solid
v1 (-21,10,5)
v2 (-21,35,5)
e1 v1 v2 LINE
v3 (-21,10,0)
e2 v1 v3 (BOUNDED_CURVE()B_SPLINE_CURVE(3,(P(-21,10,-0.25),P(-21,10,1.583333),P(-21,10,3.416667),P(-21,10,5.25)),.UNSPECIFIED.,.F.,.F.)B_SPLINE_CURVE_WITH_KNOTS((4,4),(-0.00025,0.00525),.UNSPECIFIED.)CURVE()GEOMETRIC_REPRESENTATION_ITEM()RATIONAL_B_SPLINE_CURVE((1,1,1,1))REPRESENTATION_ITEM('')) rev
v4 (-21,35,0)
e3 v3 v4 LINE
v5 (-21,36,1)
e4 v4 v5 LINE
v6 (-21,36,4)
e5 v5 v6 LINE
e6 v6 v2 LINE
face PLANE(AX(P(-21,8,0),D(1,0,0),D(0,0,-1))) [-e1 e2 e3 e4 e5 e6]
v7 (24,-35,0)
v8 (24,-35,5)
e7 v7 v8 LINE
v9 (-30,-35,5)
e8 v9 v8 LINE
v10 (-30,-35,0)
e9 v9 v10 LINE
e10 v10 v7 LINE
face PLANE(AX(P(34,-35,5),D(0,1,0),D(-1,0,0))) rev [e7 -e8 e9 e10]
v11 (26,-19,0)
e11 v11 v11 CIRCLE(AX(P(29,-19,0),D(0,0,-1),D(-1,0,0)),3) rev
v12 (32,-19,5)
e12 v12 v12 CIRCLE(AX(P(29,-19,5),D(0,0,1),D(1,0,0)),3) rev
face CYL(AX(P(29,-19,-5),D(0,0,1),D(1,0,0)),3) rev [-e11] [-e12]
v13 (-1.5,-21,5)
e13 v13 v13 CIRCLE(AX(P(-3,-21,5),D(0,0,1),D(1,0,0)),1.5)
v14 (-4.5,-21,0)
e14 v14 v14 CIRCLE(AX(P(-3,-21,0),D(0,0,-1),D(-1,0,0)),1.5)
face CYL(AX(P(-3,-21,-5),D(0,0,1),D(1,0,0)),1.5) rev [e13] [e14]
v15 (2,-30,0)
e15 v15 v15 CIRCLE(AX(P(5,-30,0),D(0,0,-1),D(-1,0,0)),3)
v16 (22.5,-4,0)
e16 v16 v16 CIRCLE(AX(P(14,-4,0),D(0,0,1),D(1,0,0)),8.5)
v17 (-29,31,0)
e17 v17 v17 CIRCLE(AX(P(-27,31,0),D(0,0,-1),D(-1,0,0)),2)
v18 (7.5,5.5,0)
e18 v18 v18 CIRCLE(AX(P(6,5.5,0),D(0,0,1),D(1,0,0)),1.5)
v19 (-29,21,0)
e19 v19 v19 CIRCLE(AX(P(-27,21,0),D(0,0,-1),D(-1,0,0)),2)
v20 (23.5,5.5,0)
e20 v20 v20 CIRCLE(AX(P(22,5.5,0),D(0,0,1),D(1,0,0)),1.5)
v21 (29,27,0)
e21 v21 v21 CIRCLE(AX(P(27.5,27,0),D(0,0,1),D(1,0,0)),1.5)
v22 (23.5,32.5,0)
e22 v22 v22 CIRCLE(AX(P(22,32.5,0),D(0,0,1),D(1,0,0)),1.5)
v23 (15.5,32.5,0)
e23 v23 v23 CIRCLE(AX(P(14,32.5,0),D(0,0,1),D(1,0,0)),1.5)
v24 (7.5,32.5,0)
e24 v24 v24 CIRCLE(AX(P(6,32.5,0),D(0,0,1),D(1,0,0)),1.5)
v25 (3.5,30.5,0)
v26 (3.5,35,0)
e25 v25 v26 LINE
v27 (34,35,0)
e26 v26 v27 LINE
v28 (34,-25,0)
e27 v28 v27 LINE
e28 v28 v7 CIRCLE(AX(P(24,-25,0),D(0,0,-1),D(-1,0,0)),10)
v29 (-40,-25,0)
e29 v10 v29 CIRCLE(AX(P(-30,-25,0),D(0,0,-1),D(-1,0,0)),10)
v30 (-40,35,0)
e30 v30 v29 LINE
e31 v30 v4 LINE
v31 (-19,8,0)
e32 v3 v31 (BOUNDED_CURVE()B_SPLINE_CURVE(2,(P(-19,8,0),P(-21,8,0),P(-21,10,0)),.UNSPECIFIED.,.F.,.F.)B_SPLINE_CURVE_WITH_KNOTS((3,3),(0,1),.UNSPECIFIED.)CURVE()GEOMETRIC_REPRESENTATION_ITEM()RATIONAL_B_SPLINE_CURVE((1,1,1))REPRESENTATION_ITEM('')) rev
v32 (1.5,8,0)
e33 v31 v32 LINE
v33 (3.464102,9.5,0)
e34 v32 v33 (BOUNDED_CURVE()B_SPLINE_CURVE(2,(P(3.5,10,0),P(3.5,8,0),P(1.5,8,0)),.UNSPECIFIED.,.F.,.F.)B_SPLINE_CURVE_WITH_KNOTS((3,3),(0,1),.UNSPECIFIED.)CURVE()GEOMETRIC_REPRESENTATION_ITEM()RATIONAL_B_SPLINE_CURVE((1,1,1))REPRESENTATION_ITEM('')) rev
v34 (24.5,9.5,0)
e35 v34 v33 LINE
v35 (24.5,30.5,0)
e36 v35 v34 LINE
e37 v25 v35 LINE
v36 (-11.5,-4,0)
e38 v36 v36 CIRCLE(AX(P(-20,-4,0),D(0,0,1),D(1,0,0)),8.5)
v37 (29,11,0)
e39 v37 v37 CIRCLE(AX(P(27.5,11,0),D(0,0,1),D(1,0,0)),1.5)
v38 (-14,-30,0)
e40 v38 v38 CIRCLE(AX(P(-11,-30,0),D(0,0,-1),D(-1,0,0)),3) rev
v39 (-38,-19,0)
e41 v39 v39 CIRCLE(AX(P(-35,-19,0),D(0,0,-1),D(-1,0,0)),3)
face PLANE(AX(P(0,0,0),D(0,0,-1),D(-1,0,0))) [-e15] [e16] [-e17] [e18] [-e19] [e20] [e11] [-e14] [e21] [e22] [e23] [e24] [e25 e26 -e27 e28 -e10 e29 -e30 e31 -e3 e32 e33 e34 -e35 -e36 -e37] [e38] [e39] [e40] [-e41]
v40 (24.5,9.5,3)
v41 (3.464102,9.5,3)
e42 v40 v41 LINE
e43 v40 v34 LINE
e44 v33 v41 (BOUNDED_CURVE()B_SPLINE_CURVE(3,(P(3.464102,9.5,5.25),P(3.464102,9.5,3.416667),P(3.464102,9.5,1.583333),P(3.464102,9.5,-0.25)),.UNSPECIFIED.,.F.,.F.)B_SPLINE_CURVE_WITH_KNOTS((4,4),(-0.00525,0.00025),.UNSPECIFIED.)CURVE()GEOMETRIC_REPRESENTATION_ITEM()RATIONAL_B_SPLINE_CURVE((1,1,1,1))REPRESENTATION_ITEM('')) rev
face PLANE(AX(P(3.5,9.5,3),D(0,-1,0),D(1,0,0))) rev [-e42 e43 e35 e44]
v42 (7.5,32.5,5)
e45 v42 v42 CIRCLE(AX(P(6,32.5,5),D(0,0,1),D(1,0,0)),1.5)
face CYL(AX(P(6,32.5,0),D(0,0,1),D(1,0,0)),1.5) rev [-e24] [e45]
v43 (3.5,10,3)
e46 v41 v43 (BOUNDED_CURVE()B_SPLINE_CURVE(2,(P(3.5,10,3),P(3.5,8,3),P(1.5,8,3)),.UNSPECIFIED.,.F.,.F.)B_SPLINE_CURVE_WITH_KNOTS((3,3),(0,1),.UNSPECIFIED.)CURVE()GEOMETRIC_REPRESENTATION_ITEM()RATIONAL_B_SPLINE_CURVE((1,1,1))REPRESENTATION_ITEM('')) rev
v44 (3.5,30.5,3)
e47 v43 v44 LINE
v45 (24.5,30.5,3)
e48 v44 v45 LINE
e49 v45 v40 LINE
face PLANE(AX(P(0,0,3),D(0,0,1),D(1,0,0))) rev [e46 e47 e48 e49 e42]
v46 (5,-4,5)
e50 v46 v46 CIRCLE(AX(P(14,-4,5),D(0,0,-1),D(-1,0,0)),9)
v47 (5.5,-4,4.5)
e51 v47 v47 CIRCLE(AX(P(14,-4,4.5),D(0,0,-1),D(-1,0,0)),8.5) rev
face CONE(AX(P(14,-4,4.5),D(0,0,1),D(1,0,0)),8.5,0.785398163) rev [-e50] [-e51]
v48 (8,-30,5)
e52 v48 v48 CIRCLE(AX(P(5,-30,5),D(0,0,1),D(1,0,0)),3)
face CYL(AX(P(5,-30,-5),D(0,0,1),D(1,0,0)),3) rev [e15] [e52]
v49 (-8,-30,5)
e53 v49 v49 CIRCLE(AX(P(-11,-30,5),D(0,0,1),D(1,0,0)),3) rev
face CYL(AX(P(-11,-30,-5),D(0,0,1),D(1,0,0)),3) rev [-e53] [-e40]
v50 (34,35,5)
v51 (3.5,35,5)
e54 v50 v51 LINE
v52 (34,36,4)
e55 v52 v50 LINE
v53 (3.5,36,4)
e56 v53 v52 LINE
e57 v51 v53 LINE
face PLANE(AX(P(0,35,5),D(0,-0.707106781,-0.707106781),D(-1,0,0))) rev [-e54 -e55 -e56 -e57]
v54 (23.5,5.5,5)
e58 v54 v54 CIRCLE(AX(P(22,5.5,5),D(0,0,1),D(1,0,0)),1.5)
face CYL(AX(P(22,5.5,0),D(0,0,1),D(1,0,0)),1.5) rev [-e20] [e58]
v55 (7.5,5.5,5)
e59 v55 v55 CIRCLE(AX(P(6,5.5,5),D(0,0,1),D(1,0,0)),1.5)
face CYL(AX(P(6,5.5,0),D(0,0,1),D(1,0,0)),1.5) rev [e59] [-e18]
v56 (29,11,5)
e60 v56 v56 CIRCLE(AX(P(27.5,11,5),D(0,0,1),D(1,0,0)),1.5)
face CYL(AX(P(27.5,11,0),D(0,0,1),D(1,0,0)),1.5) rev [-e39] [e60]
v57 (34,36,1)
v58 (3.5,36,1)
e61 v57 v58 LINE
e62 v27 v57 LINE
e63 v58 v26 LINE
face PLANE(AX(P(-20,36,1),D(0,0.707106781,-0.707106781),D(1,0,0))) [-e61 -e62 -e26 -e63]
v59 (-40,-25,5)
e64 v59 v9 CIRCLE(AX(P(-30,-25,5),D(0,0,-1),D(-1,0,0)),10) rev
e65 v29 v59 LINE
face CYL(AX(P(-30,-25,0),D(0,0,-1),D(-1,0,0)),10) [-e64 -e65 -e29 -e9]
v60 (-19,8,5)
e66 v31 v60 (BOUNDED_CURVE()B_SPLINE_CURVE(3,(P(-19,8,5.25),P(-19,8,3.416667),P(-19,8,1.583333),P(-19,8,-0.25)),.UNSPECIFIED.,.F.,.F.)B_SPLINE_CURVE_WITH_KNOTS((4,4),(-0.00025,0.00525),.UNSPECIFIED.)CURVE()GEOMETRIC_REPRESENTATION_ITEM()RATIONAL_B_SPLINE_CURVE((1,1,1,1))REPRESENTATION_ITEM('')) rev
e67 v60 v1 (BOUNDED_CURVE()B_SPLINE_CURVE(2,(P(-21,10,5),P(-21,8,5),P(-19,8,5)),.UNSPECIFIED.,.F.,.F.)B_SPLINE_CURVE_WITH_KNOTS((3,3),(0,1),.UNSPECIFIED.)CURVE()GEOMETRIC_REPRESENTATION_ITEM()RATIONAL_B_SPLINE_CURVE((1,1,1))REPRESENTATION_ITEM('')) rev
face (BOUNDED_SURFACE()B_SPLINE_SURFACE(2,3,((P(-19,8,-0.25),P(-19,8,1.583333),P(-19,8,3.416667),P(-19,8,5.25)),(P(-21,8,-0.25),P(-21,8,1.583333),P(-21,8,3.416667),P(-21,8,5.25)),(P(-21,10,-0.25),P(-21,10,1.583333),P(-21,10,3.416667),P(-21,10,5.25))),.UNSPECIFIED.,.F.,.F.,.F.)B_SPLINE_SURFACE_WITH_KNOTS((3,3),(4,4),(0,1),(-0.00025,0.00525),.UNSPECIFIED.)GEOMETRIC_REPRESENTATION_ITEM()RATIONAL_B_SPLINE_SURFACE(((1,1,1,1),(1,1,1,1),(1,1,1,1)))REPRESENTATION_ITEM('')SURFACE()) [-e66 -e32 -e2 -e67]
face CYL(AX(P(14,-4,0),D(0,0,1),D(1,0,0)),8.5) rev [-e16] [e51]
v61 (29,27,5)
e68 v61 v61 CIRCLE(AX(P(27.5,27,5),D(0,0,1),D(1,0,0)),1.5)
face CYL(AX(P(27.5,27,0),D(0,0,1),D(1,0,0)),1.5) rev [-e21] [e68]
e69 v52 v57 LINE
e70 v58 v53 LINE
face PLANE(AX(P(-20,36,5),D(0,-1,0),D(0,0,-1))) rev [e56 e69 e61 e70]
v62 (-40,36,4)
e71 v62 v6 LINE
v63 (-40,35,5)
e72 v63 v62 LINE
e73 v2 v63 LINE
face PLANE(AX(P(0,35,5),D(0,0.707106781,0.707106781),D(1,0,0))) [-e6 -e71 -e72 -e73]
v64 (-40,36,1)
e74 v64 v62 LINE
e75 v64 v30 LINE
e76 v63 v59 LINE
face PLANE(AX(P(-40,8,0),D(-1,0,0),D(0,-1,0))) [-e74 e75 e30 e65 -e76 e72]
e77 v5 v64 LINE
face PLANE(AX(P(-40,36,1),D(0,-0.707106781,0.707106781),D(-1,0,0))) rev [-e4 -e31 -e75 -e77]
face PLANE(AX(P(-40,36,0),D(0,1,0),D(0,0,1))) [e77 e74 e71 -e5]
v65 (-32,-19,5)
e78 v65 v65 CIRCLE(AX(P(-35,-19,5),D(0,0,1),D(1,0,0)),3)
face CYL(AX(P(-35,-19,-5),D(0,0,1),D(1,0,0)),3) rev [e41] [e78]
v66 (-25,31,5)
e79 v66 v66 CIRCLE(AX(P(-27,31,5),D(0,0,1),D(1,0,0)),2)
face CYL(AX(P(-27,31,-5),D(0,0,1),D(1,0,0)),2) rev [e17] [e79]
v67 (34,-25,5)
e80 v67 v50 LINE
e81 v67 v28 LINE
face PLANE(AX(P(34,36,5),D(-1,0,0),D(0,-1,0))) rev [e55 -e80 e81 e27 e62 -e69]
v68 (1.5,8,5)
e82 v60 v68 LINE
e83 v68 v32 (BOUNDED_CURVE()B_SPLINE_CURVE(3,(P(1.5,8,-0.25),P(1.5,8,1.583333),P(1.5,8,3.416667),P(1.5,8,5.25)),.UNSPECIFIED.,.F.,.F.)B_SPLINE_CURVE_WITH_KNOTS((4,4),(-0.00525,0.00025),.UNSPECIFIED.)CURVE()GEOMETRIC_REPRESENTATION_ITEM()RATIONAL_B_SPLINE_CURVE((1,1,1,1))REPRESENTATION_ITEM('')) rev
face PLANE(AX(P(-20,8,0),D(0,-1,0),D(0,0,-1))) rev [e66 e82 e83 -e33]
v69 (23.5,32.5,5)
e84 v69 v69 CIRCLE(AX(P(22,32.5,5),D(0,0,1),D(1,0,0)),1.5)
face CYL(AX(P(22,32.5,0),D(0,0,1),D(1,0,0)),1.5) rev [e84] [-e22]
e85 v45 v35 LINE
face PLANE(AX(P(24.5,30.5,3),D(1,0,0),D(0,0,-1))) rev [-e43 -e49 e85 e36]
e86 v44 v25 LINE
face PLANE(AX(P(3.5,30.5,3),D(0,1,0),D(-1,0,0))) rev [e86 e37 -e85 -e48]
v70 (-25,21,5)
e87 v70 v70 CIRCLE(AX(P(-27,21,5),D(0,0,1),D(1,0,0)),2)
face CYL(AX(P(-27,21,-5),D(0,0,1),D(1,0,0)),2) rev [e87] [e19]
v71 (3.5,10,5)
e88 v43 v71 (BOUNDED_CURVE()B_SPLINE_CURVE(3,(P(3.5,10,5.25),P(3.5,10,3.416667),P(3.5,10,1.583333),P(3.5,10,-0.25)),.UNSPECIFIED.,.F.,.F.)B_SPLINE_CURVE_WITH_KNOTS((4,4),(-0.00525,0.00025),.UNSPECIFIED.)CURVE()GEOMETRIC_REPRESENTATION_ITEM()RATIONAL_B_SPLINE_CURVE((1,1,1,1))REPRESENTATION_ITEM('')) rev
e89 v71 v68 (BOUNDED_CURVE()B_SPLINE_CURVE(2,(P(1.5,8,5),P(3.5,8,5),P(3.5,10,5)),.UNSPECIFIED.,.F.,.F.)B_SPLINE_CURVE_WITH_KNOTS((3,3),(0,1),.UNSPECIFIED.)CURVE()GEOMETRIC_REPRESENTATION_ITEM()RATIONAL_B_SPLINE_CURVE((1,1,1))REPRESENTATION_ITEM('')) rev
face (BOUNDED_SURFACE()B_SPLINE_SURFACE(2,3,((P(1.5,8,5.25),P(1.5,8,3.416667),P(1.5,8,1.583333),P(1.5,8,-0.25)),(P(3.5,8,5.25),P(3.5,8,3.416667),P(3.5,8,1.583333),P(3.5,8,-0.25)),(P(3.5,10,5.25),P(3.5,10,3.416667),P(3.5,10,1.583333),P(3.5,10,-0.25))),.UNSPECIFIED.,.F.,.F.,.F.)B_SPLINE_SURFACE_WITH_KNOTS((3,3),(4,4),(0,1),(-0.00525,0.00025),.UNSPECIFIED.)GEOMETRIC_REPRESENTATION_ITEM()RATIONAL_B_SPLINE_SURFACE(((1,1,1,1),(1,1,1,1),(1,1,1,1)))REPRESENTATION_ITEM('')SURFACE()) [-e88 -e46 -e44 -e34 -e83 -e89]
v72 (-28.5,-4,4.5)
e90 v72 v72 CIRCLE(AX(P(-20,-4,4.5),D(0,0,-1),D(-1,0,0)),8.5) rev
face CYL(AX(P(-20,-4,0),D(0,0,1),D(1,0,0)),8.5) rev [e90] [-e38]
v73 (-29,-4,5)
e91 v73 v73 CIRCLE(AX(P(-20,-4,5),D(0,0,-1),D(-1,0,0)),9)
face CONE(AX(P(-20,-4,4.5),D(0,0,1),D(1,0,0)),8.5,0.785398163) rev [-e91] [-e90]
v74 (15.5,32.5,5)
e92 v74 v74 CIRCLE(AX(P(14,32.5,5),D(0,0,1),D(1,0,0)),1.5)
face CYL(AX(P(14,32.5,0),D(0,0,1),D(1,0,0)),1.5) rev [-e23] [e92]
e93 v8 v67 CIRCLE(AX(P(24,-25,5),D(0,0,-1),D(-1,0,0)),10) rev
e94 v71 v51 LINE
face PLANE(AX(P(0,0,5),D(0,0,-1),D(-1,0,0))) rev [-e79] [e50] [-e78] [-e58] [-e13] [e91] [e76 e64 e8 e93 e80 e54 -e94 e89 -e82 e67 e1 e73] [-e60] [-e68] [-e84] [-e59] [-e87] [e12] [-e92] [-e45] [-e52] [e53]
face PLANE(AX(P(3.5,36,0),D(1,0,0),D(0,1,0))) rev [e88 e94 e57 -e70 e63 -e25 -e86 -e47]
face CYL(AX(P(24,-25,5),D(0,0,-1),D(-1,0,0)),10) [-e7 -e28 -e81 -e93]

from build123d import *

# Parameters (mm, degrees)
SZKIC1_W                    = 54
SZKIC1_H                    = 71
DODANIE_WYCI_GNI_CIE1_DEPTH = 5
SZKIC2_W                    = 23.5
SZKIC2_H                    = 28
WYTNIJ_WYCI_GNI_CIE1_DEPTH  = 5
SZKIC3_W                    = 21
SZKIC3_H                    = 21
WYTNIJ_WYCI_GNI_CIE2_DEPTH  = 3
SZKIC4_R                    = 1.5
WYTNIJ_WYCI_GNI_CIE3_DEPTH  = 5
SZKIC5_W                    = 20
SZKIC5_H                    = 43
DODANIE_WYCI_GNI_CIE2_DEPTH = 5
SZKIC6_R                    = 8.5
WYTNIJ_WYCI_GNI_CIE4_DEPTH  = 5
SZKIC7_R                    = 3
WYTNIJ_WYCI_GNI_CIE5_DEPTH  = 10
ZAOKR_GLENIE3_R             = 10
SZKIC8_W                    = 19
SZKIC8_H                    = 28
DODANIE_WYCI_GNI_CIE3_DEPTH = 5
ZAOKR_GLENIE2_SIZE          = 2
SZKIC9_R                    = 2
WYTNIJ_WYCI_GNI_CIE6_DEPTH  = 10
SFAZOWANIE2_SIZE            = 1
SFAZOWANIE3_SIZE            = 0.5
SZKIC10_R                   = 1.5
WYTNIJ_WYCI_GNI_CIE7_DEPTH  = 10


with BuildPart() as part:
    # Szkic1 → Dodanie-wyciągnięcie1 (new body)
    with BuildSketch(Plane.XY):
        with Locations((7, 0.5)):
            Rectangle(SZKIC1_W, SZKIC1_H)
    extrude(amount=DODANIE_WYCI_GNI_CIE1_DEPTH)

    # Szkic2 → Wytnij-wyciągnięcie1 (cut)
    with BuildSketch(Plane.XY.offset(5)):
        with Locations((-8.25, 22)):
            Rectangle(SZKIC2_W, SZKIC2_H)
    extrude(amount=-WYTNIJ_WYCI_GNI_CIE1_DEPTH, mode=Mode.SUBTRACT)

    # Szkic3 → Wytnij-wyciągnięcie2 (cut)
    with BuildSketch(Plane(origin=(0, 0, 0), x_dir=(-1, 0, 0), z_dir=(0, 0, -1))):
        with Locations((-14, 20)):
            Rectangle(SZKIC3_W, SZKIC3_H)
    extrude(amount=-WYTNIJ_WYCI_GNI_CIE2_DEPTH, mode=Mode.SUBTRACT)

    # Szkic4 → Wytnij-wyciągnięcie3 (cut)
    with BuildSketch(Plane.XY.offset(5)):
        with Locations((6, 32.5)):
            Circle(SZKIC4_R)
        with Locations((14, 32.5)):
            Circle(SZKIC4_R)
        with Locations((22, 32.5)):
            Circle(SZKIC4_R)
        with Locations((22, 5.5)):
            Circle(SZKIC4_R)
        with Locations((6, 5.5)):
            Circle(SZKIC4_R)
        with Locations((27.5, 27)):
            Circle(SZKIC4_R)
        with Locations((27.5, 11)):
            Circle(SZKIC4_R)
    extrude(amount=-WYTNIJ_WYCI_GNI_CIE3_DEPTH, mode=Mode.SUBTRACT)

    # Szkic5 → Dodanie-wyciągnięcie2 (add)
    with BuildSketch(Plane.XY.offset(5)):
        with Locations((-30, -13.5)):
            Rectangle(SZKIC5_W, SZKIC5_H)
    extrude(amount=-DODANIE_WYCI_GNI_CIE2_DEPTH)

    # Szkic6 → Wytnij-wyciągnięcie4 (cut)
    with BuildSketch(Plane.XY.offset(5)):
        with Locations((-20, -4)):
            Circle(SZKIC6_R)
        with Locations((14, -4)):
            Circle(SZKIC6_R)
    extrude(amount=-WYTNIJ_WYCI_GNI_CIE4_DEPTH, mode=Mode.SUBTRACT)

    # Szkic7 → Wytnij-wyciągnięcie5 (cut)
    with BuildSketch(Plane.XY.offset(5)):
        with Locations((-11, -30)):
            Circle(SZKIC7_R)
        with Locations((5, -30)):
            Circle(SZKIC7_R)
        with Locations((-35, -19)):
            Circle(SZKIC7_R)
        with Locations((29, -19)):
            Circle(SZKIC7_R)
    extrude(amount=-WYTNIJ_WYCI_GNI_CIE5_DEPTH, mode=Mode.SUBTRACT)

    # Zaokrąglenie3
    zaokr_glenie3_edges = [part.edges().sort_by_distance(p)[0] for p in [
        (-40, -35, 2.5),
        (34, -35, 2.5),
    ]]
    fillet(zaokr_glenie3_edges, radius=ZAOKR_GLENIE3_R)

    # Szkic8 → Dodanie-wyciągnięcie3 (add)
    with BuildSketch(Plane.XY.offset(5)):
        with Locations((-30.5, 22)):
            Rectangle(SZKIC8_W, SZKIC8_H)
    extrude(amount=-DODANIE_WYCI_GNI_CIE3_DEPTH)

    # Zaokrąglenie2
    # a fillet whose section is not a circle: 2 mm, written as the material it adds along each edge
    with BuildSketch(Plane(origin=(3.5, 8, 5), x_dir=(0, 1, 0), z_dir=(0, 0, -1))) as zaokr_glenie2_piece_1_section:
        with BuildLine():
            Bezier((ZAOKR_GLENIE2_SIZE, 0), (0, 0), (0, -ZAOKR_GLENIE2_SIZE), weights=[1, 1, 1])
            Line((0, -ZAOKR_GLENIE2_SIZE), (0, 0))
            Line((0, 0), (ZAOKR_GLENIE2_SIZE, 0))
        make_face()
    zaokr_glenie2_piece_1 = extrude(amount=5, mode=Mode.PRIVATE)
    zaokr_glenie2_piece_1 = split(zaokr_glenie2_piece_1, bisect_by=Plane(origin=(3.5, 9.5, 5), z_dir=(0, 1, 0)), keep=Keep.TOP, mode=Mode.PRIVATE)
    zaokr_glenie2_piece_1 = split(zaokr_glenie2_piece_1, bisect_by=Plane(origin=(3.5, 8, 3), z_dir=(0, 0, 1)), keep=Keep.TOP, mode=Mode.PRIVATE)
    add(zaokr_glenie2_piece_1)
    with BuildSketch(Plane(origin=(3.5, 8, 5), x_dir=(0, 1, 0), z_dir=(0, 0, -1))) as zaokr_glenie2_piece_2_section:
        with BuildLine():
            Bezier((ZAOKR_GLENIE2_SIZE, 0), (0, 0), (0, -ZAOKR_GLENIE2_SIZE), weights=[1, 1, 1])
            Line((0, -ZAOKR_GLENIE2_SIZE), (0, 0))
            Line((0, 0), (ZAOKR_GLENIE2_SIZE, 0))
        make_face()
    zaokr_glenie2_piece_2 = extrude(amount=5, mode=Mode.PRIVATE)
    zaokr_glenie2_piece_2 = split(zaokr_glenie2_piece_2, bisect_by=Plane(origin=(3.5, 9.5, 5), z_dir=(0, -1, 0)), keep=Keep.TOP, mode=Mode.PRIVATE)
    zaokr_glenie2_piece_2 = split(zaokr_glenie2_piece_2, bisect_by=Plane(origin=(3.5, 8, 3), z_dir=(0, 0, 1)), keep=Keep.TOP, mode=Mode.PRIVATE)
    add(zaokr_glenie2_piece_2)
    with BuildSketch(Plane(origin=(3.5, 8, 5), x_dir=(0, 1, 0), z_dir=(0, 0, -1))) as zaokr_glenie2_piece_3_section:
        with BuildLine():
            Bezier((ZAOKR_GLENIE2_SIZE, 0), (0, 0), (0, -ZAOKR_GLENIE2_SIZE), weights=[1, 1, 1])
            Line((0, -ZAOKR_GLENIE2_SIZE), (0, 0))
            Line((0, 0), (ZAOKR_GLENIE2_SIZE, 0))
        make_face()
    zaokr_glenie2_piece_3 = extrude(amount=5, mode=Mode.PRIVATE)
    zaokr_glenie2_piece_3 = split(zaokr_glenie2_piece_3, bisect_by=Plane(origin=(3.5, 9.5, 5), z_dir=(0, -1, 0)), keep=Keep.TOP, mode=Mode.PRIVATE)
    zaokr_glenie2_piece_3 = split(zaokr_glenie2_piece_3, bisect_by=Plane(origin=(3.5, 8, 3), z_dir=(0, 0, -1)), keep=Keep.TOP, mode=Mode.PRIVATE)
    add(zaokr_glenie2_piece_3)
    with BuildSketch(Plane(origin=(-21, 8, 5), x_dir=(1, 0, 0), z_dir=(0, 0, -1))) as zaokr_glenie2_piece_4:
        with BuildLine():
            Bezier((ZAOKR_GLENIE2_SIZE, 0), (0, 0), (0, -ZAOKR_GLENIE2_SIZE), weights=[1, 1, 1])
            Line((0, -ZAOKR_GLENIE2_SIZE), (0, 0))
            Line((0, 0), (ZAOKR_GLENIE2_SIZE, 0))
        make_face()
    extrude(amount=5)

    # Szkic9 → Wytnij-wyciągnięcie6 (cut)
    with BuildSketch(Plane.XY.offset(5)):
        with Locations((-27, 31)):
            Circle(SZKIC9_R)
        with Locations((-27, 21)):
            Circle(SZKIC9_R)
    extrude(amount=-WYTNIJ_WYCI_GNI_CIE6_DEPTH, mode=Mode.SUBTRACT)

    # Sfazowanie2
    sfazowanie2_edges = [part.edges().sort_by_distance(p)[0] for p in [
        (-30.5, 36, 0),
        (-30.5, 36, 5),
        (18.75, 36, 5),
        (18.75, 36, 0),
    ]]
    chamfer(sfazowanie2_edges, length=SFAZOWANIE2_SIZE)

    # Sfazowanie3
    sfazowanie3_edges = [part.edges().sort_by_distance(p)[0] for p in [
        (-28.5, -4, 5),
        (5.5, -4, 5),
    ]]
    chamfer(sfazowanie3_edges, length=SFAZOWANIE3_SIZE)

    # Szkic10 → Wytnij-wyciągnięcie7 (cut)
    with BuildSketch(Plane.XY.offset(5)):
        with Locations((-3, -21)):
            Circle(SZKIC10_R)
    extrude(amount=-WYTNIJ_WYCI_GNI_CIE7_DEPTH, mode=Mode.SUBTRACT)


solid = part.part
